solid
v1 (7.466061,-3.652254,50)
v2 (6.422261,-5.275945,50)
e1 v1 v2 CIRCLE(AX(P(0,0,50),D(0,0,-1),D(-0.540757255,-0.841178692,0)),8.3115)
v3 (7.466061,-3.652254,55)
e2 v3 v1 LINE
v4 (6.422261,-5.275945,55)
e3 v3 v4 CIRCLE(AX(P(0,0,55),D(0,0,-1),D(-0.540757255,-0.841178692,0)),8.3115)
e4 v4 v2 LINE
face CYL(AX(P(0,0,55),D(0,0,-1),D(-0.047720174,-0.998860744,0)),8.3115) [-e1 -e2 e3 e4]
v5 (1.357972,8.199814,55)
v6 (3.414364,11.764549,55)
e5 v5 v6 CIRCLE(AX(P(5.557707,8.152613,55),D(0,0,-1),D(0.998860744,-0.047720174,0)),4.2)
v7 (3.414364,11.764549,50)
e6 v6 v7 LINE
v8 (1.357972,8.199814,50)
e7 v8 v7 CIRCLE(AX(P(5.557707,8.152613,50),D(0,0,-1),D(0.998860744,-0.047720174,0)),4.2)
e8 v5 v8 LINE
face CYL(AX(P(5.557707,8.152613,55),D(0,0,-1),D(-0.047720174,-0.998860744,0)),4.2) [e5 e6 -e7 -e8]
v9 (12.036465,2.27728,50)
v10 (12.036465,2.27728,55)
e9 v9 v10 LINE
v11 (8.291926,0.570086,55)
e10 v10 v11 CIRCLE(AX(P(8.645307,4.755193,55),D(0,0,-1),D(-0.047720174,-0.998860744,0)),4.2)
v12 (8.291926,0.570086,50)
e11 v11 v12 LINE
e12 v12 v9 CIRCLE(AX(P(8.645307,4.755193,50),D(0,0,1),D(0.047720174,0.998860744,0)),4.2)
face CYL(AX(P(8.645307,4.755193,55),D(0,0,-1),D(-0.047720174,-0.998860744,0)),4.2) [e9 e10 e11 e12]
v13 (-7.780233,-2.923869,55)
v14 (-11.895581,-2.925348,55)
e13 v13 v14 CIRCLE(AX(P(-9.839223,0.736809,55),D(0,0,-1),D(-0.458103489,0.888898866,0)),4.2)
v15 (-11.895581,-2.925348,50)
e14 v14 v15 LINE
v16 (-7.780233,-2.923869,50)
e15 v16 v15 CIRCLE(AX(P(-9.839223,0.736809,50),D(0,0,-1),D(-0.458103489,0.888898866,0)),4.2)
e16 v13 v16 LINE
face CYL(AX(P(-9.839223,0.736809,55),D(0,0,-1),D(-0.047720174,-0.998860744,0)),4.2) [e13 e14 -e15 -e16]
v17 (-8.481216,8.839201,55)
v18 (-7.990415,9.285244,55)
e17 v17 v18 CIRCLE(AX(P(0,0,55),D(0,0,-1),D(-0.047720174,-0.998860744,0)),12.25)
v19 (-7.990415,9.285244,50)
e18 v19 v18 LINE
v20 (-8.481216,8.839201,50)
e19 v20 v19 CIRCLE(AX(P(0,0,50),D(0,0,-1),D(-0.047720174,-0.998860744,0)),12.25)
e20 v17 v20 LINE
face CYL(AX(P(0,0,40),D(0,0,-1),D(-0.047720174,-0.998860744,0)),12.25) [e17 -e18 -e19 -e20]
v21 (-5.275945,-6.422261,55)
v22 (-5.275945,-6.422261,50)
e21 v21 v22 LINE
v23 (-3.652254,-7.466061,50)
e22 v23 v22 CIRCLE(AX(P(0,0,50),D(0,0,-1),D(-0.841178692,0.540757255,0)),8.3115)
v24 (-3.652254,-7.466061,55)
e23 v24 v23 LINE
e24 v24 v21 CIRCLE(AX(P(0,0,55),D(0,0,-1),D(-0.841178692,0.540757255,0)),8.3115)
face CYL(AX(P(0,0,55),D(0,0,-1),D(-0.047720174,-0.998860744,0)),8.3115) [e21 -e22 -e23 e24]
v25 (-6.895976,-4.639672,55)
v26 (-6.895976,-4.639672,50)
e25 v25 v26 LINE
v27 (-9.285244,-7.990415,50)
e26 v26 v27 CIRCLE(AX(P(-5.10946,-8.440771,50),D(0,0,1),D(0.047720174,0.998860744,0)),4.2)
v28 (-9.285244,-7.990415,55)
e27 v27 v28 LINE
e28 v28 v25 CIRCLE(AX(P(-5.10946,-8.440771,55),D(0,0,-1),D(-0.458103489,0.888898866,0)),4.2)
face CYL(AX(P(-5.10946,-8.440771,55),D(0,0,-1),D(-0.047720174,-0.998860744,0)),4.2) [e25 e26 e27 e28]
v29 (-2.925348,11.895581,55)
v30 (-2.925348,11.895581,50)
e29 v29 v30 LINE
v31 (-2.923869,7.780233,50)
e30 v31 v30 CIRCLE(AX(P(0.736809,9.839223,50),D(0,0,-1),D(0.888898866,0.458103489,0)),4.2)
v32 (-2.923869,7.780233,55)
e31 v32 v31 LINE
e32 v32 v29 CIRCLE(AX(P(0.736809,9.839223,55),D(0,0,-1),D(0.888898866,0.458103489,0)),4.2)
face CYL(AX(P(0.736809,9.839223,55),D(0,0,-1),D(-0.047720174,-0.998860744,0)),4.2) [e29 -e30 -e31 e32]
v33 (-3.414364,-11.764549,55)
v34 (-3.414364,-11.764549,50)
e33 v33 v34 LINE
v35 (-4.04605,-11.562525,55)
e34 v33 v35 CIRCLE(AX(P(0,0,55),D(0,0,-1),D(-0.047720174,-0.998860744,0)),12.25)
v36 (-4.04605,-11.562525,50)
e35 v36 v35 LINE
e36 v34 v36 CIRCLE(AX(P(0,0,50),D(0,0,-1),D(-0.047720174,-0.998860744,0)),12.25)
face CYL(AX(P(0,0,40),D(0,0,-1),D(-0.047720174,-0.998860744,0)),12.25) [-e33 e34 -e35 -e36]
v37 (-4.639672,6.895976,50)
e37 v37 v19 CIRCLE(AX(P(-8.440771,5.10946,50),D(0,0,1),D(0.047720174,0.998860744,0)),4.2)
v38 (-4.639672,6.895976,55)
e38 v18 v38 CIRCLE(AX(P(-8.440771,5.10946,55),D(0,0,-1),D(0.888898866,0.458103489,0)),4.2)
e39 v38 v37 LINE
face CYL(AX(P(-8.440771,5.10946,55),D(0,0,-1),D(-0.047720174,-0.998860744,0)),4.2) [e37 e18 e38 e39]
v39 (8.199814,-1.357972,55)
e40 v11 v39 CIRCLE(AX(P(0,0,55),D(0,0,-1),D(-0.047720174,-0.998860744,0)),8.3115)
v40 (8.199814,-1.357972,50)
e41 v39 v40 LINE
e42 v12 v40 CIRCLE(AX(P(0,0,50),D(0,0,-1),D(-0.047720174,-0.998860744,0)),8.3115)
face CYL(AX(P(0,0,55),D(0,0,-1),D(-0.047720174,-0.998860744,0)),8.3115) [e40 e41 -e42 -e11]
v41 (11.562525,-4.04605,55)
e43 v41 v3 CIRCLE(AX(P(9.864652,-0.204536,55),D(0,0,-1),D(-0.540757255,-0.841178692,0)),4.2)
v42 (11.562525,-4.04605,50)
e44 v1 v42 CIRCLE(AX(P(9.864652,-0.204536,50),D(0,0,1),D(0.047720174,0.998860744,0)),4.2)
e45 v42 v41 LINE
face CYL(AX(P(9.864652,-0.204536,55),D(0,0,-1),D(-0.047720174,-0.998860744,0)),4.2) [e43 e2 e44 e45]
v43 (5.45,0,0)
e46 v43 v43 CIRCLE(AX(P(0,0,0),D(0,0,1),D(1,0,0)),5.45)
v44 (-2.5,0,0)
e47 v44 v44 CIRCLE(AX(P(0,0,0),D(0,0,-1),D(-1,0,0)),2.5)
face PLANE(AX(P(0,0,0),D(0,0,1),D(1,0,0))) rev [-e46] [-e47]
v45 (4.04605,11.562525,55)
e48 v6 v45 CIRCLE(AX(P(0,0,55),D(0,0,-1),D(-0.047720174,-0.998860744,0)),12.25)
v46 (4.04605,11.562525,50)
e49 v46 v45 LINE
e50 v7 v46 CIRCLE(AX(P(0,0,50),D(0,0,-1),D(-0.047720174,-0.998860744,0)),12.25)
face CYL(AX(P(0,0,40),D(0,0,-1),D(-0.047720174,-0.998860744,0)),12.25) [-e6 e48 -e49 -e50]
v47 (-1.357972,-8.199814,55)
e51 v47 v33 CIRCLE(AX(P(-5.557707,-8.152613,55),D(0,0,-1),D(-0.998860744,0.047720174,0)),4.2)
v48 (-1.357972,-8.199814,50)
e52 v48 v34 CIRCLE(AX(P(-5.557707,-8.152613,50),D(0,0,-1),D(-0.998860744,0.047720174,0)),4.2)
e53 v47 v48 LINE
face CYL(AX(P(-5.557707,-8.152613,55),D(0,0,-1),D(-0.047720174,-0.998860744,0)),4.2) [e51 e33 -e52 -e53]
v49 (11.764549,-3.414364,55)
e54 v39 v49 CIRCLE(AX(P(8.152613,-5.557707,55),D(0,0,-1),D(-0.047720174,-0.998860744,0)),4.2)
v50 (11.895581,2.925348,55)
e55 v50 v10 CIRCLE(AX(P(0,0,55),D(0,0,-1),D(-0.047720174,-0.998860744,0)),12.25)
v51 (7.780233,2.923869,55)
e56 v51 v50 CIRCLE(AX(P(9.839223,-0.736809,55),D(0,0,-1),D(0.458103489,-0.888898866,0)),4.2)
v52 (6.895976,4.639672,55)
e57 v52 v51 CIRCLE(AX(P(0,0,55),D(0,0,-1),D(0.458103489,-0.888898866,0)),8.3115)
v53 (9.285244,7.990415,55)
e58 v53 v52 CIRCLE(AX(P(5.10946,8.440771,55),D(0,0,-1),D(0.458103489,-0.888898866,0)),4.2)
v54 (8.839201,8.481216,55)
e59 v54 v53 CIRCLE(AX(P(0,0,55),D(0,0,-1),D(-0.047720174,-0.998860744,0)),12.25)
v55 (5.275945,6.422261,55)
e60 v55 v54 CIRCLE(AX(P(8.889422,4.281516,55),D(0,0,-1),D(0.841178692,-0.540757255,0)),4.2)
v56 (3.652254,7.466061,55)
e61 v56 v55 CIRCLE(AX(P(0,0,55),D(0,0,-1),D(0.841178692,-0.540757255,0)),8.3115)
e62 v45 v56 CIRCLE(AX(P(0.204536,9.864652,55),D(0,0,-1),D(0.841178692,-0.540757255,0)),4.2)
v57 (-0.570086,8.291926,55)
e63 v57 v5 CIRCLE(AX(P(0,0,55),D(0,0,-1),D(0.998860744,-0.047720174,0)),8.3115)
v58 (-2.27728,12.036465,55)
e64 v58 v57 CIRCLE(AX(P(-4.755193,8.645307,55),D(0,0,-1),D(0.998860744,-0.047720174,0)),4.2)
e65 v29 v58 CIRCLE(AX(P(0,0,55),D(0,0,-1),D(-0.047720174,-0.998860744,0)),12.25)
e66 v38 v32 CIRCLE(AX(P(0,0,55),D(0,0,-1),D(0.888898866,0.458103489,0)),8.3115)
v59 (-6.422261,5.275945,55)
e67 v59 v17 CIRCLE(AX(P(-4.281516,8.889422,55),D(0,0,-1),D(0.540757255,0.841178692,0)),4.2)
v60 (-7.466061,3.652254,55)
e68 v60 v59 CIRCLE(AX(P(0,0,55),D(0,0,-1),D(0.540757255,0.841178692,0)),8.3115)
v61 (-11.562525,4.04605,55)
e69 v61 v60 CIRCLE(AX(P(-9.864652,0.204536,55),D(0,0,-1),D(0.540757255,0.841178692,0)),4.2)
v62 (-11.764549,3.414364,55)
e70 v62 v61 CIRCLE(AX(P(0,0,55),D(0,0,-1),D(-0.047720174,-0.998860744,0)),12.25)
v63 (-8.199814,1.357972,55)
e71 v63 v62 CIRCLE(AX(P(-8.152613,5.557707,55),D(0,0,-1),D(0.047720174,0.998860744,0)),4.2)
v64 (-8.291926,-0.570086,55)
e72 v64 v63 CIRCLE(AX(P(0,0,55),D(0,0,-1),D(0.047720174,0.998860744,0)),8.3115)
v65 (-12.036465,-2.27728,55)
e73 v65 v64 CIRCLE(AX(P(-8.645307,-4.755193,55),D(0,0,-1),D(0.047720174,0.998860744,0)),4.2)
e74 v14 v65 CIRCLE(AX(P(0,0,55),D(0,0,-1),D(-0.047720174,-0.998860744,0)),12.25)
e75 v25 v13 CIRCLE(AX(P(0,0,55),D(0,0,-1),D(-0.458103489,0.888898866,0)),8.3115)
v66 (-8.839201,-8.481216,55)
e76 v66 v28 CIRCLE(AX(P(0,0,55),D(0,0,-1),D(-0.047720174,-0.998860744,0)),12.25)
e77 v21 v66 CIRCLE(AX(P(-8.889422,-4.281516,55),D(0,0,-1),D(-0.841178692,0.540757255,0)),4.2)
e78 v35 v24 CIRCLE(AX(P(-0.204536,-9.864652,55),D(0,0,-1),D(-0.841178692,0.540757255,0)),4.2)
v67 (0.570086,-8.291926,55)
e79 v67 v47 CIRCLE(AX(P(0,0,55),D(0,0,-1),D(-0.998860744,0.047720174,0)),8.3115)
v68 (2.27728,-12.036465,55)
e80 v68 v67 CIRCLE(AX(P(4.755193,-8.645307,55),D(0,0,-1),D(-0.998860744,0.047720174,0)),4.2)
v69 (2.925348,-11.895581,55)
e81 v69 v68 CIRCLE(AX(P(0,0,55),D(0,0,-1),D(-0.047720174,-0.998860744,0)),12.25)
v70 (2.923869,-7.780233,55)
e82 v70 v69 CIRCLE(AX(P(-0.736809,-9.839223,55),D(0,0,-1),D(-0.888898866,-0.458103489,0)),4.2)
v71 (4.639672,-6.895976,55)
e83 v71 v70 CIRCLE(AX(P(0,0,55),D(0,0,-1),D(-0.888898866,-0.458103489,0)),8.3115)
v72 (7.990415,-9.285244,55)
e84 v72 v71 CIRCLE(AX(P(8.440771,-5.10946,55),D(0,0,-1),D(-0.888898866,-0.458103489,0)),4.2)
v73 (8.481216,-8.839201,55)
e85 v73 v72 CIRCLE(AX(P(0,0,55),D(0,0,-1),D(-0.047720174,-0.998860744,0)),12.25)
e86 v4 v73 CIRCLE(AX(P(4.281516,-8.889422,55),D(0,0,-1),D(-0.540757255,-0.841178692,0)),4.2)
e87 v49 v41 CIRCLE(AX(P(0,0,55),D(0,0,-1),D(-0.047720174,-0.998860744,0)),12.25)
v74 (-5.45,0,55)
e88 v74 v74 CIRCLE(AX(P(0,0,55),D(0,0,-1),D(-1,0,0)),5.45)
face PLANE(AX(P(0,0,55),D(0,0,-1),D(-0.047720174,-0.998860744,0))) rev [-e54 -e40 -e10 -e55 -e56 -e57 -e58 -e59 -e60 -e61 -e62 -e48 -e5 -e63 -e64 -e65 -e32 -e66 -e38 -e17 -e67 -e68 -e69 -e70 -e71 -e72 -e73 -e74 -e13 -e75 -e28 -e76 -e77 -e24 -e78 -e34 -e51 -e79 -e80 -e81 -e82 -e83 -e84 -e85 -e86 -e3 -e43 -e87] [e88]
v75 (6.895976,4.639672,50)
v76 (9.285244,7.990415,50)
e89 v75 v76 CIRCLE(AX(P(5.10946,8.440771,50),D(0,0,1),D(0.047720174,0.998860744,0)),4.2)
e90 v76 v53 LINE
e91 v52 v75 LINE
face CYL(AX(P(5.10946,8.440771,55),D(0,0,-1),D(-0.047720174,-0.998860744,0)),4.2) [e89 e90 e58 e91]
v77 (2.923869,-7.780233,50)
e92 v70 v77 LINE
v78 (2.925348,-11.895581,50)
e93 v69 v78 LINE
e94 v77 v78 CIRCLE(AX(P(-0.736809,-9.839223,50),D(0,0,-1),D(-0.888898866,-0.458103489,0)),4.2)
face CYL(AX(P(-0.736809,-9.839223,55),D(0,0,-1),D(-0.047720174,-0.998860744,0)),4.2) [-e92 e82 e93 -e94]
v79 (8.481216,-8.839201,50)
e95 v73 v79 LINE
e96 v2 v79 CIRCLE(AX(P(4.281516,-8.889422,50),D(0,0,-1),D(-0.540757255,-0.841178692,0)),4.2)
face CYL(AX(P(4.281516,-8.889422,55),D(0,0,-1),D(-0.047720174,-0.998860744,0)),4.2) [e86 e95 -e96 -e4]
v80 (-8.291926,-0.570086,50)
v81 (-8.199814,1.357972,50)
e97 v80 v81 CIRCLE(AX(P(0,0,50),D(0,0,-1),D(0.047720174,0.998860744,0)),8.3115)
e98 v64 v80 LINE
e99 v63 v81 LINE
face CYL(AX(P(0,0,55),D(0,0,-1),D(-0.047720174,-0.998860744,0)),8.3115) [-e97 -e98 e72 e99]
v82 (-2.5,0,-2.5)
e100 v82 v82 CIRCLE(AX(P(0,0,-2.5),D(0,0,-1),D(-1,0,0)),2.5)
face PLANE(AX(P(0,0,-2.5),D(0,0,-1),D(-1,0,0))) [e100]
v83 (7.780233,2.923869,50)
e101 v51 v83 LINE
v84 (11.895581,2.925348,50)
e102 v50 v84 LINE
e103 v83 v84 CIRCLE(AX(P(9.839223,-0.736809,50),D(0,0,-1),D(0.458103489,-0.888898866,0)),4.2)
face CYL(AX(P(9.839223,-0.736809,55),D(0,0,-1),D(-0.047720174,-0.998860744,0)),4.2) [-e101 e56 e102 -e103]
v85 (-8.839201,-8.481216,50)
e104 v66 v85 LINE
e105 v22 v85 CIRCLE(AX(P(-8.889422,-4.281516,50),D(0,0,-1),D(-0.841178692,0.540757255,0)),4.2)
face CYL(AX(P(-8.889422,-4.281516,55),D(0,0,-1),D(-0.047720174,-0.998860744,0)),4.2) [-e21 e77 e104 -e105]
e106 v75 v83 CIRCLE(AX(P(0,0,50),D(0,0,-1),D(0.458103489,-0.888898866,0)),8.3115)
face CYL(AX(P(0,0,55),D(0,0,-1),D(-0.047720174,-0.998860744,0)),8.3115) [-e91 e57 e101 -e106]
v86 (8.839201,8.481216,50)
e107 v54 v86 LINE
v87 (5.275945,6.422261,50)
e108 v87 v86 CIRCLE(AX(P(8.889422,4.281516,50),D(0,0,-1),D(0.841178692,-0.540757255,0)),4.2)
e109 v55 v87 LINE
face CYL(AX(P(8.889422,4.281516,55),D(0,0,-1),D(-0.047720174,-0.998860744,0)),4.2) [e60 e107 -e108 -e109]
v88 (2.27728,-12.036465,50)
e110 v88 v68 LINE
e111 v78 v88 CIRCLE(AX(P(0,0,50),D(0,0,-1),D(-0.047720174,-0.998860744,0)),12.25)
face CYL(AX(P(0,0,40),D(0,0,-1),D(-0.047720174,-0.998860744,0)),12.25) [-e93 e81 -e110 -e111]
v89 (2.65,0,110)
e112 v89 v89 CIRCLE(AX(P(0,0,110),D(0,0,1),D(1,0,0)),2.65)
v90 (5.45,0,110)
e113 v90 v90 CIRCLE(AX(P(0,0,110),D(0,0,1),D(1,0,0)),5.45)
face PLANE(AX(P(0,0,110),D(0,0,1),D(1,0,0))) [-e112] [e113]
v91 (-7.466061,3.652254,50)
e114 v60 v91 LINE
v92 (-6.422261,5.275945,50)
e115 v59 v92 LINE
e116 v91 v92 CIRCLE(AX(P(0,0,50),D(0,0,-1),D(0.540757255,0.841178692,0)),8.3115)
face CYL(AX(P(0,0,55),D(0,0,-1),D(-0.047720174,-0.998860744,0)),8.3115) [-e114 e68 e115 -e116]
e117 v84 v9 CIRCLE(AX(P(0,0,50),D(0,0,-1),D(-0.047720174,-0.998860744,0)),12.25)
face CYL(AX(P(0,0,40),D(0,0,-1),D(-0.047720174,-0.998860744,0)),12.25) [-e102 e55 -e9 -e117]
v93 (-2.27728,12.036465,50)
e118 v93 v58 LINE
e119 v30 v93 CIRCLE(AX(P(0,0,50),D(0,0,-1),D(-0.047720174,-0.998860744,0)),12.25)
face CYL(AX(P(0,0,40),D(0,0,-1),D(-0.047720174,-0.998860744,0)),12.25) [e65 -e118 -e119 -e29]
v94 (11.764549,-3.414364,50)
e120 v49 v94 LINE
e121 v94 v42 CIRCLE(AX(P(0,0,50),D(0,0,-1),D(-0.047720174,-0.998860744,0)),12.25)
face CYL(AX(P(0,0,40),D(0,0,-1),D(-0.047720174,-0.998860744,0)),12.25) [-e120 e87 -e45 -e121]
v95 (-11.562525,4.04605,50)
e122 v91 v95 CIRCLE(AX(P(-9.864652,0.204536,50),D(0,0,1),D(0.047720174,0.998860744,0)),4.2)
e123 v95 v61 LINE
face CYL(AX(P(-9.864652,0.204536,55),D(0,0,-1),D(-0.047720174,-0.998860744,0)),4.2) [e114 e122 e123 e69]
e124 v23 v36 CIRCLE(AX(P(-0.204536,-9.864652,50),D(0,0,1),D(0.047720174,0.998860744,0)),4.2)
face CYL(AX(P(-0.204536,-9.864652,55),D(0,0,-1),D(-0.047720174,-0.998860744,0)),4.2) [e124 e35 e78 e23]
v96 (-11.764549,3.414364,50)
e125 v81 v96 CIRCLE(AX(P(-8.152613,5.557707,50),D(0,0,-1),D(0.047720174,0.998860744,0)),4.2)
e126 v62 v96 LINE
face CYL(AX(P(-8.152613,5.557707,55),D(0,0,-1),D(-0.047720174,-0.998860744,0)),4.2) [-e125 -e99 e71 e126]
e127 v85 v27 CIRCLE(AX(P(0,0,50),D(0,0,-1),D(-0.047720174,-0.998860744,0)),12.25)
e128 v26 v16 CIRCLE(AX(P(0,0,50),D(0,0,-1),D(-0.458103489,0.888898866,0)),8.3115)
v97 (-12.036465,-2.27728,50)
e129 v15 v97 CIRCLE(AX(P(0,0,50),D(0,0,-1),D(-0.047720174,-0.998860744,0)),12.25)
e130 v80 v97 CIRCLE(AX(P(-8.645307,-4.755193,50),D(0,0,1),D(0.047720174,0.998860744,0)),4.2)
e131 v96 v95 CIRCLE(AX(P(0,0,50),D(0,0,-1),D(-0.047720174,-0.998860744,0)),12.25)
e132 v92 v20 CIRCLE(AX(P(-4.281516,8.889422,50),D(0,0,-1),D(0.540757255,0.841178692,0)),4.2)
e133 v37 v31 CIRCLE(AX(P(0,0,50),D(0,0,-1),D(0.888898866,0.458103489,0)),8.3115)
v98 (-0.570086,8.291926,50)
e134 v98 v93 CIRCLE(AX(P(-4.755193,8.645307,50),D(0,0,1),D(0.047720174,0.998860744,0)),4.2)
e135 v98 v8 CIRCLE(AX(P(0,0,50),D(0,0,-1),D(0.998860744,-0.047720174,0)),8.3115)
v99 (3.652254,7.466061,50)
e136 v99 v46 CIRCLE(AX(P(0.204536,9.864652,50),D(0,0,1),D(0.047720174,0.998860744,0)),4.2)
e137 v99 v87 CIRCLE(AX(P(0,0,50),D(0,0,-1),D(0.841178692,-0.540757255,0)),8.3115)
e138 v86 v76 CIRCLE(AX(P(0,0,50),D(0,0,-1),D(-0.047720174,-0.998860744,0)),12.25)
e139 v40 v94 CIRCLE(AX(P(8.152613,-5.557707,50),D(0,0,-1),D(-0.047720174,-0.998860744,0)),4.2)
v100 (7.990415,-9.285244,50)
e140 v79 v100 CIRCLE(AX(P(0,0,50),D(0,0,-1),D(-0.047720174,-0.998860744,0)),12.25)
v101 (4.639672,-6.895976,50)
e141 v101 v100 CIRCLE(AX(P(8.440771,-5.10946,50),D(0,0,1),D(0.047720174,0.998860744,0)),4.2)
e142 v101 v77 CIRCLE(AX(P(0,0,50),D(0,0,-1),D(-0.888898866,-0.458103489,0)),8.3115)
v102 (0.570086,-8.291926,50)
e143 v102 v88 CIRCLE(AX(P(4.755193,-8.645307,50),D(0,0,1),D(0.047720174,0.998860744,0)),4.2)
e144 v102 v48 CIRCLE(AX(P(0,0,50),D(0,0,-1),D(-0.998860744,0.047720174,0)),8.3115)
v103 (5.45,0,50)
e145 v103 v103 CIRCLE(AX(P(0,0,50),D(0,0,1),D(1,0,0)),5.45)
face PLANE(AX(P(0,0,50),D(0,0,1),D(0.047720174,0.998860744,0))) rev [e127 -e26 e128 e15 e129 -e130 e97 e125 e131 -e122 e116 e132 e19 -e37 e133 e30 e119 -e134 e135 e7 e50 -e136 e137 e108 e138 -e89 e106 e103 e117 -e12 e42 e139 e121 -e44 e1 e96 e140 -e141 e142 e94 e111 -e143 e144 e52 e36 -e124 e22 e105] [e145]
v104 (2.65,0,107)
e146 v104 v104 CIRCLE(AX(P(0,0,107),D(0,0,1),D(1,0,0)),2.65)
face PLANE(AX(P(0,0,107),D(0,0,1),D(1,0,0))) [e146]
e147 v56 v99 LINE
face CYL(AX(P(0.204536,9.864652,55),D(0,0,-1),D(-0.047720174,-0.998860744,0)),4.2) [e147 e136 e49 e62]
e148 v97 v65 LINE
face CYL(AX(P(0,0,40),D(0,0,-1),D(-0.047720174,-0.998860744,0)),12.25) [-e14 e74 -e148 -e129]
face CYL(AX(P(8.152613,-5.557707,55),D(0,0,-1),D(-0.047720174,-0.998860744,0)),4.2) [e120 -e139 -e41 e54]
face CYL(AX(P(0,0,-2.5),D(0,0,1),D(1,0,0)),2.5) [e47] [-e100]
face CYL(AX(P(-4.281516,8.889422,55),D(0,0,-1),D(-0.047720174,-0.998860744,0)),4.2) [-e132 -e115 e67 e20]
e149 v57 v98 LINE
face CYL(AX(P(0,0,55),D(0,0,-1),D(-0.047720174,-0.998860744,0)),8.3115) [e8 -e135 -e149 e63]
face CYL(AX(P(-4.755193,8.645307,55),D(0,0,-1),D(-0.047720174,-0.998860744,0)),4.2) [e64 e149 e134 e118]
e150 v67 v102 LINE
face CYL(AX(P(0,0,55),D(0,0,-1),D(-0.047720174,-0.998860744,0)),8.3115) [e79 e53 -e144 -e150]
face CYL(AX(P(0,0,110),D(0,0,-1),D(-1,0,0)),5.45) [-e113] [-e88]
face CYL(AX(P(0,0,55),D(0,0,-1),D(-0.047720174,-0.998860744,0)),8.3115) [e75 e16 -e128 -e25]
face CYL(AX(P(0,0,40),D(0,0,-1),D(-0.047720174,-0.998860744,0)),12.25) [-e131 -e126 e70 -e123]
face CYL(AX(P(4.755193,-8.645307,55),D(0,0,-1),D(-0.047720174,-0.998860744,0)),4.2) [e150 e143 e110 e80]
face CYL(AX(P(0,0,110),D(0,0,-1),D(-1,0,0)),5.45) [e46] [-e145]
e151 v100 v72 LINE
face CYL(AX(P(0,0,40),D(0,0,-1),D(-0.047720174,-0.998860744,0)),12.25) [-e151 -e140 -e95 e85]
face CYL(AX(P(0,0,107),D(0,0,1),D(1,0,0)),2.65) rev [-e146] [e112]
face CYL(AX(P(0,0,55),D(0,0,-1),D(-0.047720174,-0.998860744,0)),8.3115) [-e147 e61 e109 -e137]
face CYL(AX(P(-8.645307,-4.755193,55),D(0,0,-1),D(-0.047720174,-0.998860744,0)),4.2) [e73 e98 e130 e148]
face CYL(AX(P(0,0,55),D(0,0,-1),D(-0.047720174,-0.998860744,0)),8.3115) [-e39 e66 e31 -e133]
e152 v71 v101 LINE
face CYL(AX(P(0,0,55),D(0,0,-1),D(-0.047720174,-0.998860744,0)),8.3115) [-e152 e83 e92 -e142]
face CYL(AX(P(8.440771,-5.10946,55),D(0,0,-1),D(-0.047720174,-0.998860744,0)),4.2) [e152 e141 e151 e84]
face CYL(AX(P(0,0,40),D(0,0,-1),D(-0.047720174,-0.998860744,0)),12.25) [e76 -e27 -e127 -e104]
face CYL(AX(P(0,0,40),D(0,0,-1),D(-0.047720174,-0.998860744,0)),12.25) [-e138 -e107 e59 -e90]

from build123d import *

# Parameters (mm, degrees)
SKETCH1_R           = 5.45
BOSS_EXTRUDE1_DEPTH = 110
SKETCH6_R           = 2.5
BOSS_EXTRUDE2_DEPTH = 2.5
SKETCH7_R           = 2.65
CUT_EXTRUDE1_DEPTH  = 3
JOIN1_START         = 50
JOIN1_DEPTH         = 5


# Read off the part's stored shape, not the designer's step: Join1
with BuildPart() as part:
    # Sketch1 → Boss-Extrude1 (new body)
    with BuildSketch(Plane.XY):
        Circle(SKETCH1_R)
    extrude(amount=BOSS_EXTRUDE1_DEPTH)

    # Sketch6 → Boss-Extrude2 (add)
    with BuildSketch(Plane(origin=(0, 0, 0), x_dir=(-1, 0, 0), z_dir=(0, 0, -1))):
        Circle(SKETCH6_R)
    extrude(amount=BOSS_EXTRUDE2_DEPTH)

    # Sketch7 → Cut-Extrude1 (cut)
    with BuildSketch(Plane.XY.offset(110)):
        Circle(SKETCH7_R)
    extrude(amount=-CUT_EXTRUDE1_DEPTH, mode=Mode.SUBTRACT)

    # Join1 outline → Join1 (add)
    with BuildSketch(Plane.XY.offset(JOIN1_START)):
        with BuildLine():
            ThreePointArc((-9.285244381, -7.990415307), (-9.065544683, -8.238834845), (-8.839200881, -8.481216173))
            ThreePointArc((-8.839200881, -8.481216173), (-6.788114029, -7.918067874), (-5.275945069, -6.422260963))
            ThreePointArc((-5.275945069, -6.422260963), (-4.494503923, -6.991456696), (-3.652254242, -7.466061291))
            ThreePointArc((-3.652254242, -7.466061291), (-4.385263154, -9.462756364), (-4.046049861, -11.562524833))
            ThreePointArc((-4.046049861, -11.562524833), (-3.731574572, -11.667812615), (-3.414364426, -11.764549102))
            ThreePointArc((-3.414364426, -11.764549102), (-1.919645256, -10.251304943), (-1.357971977, -8.199813678))
            ThreePointArc((-1.357971977, -8.199813678), (-0.396626227, -8.30203107), (0.570085691, -8.291925865))
            ThreePointArc((0.570085691, -8.291925865), (0.933628889, -10.387618978), (2.277280452, -12.036465168))
            ThreePointArc((2.277280452, -12.036465168), (2.602267932, -11.970409417), (2.92534822, -11.895580599))
            ThreePointArc((2.92534822, -11.895580599), (3.463190913, -9.83771313), (2.923868609, -7.78023294))
            ThreePointArc((2.923868609, -7.78023294), (3.807527147, -7.388082923), (4.639671624, -6.8959756))
            ThreePointArc((4.639671624, -6.8959756), (6.002355825, -8.529127476), (7.990415307, -9.285244381))
            ThreePointArc((7.990415307, -9.285244381), (8.238834845, -9.065544683), (8.481216173, -8.839200881))
            ThreePointArc((8.481216173, -8.839200881), (7.918067874, -6.788114029), (6.422260963, -5.275945069))
            ThreePointArc((6.422260963, -5.275945069), (6.991456696, -4.494503923), (7.466061291, -3.652254242))
            ThreePointArc((7.466061291, -3.652254242), (9.462756364, -4.385263154), (11.562524833, -4.046049861))
            ThreePointArc((11.562524833, -4.046049861), (11.667812615, -3.731574572), (11.764549102, -3.414364426))
            ThreePointArc((11.764549102, -3.414364426), (10.251304943, -1.919645256), (8.199813678, -1.357971977))
            ThreePointArc((8.199813678, -1.357971977), (8.30203107, -0.396626227), (8.291925865, 0.570085691))
            ThreePointArc((8.291925865, 0.570085691), (10.387618978, 0.933628889), (12.036465168, 2.277280452))
            ThreePointArc((12.036465168, 2.277280452), (11.970409417, 2.602267932), (11.895580599, 2.92534822))
            ThreePointArc((11.895580599, 2.92534822), (9.83771313, 3.463190913), (7.78023294, 2.923868609))
            ThreePointArc((7.78023294, 2.923868609), (7.388082923, 3.807527147), (6.8959756, 4.639671624))
            ThreePointArc((6.8959756, 4.639671624), (8.529127476, 6.002355825), (9.285244381, 7.990415307))
            ThreePointArc((9.285244381, 7.990415307), (9.065544683, 8.238834845), (8.839200881, 8.481216173))
            ThreePointArc((8.839200881, 8.481216173), (6.788114029, 7.918067874), (5.275945069, 6.422260963))
            ThreePointArc((5.275945069, 6.422260963), (4.494503923, 6.991456696), (3.652254242, 7.466061291))
            ThreePointArc((3.652254242, 7.466061291), (4.385263154, 9.462756364), (4.046049861, 11.562524833))
            ThreePointArc((4.046049861, 11.562524833), (3.731574572, 11.667812615), (3.414364426, 11.764549102))
            ThreePointArc((3.414364426, 11.764549102), (1.919645256, 10.251304943), (1.357971977, 8.199813678))
            ThreePointArc((1.357971977, 8.199813678), (0.396626227, 8.30203107), (-0.570085691, 8.291925865))
            ThreePointArc((-0.570085691, 8.291925865), (-0.933628889, 10.387618978), (-2.277280452, 12.036465168))
            ThreePointArc((-2.277280452, 12.036465168), (-2.602267932, 11.970409417), (-2.92534822, 11.895580599))
            ThreePointArc((-2.92534822, 11.895580599), (-3.463190913, 9.83771313), (-2.923868609, 7.78023294))
            ThreePointArc((-2.923868609, 7.78023294), (-3.807527147, 7.388082923), (-4.639671624, 6.8959756))
            ThreePointArc((-4.639671624, 6.8959756), (-6.002355825, 8.529127476), (-7.990415307, 9.285244381))
            ThreePointArc((-7.990415307, 9.285244381), (-8.238834845, 9.065544683), (-8.481216173, 8.839200881))
            ThreePointArc((-8.481216173, 8.839200881), (-7.918067874, 6.788114029), (-6.422260963, 5.275945069))
            ThreePointArc((-6.422260963, 5.275945069), (-6.991456696, 4.494503923), (-7.466061291, 3.652254242))
            ThreePointArc((-7.466061291, 3.652254242), (-9.462756364, 4.385263154), (-11.562524833, 4.046049861))
            ThreePointArc((-11.562524833, 4.046049861), (-11.667812615, 3.731574572), (-11.764549102, 3.414364426))
            ThreePointArc((-11.764549102, 3.414364426), (-10.251304943, 1.919645256), (-8.199813678, 1.357971977))
            ThreePointArc((-8.199813678, 1.357971977), (-8.30203107, 0.396626227), (-8.291925865, -0.570085691))
            ThreePointArc((-8.291925865, -0.570085691), (-10.387618978, -0.933628889), (-12.036465168, -2.277280452))
            ThreePointArc((-12.036465168, -2.277280452), (-11.970409417, -2.602267932), (-11.895580599, -2.92534822))
            ThreePointArc((-11.895580599, -2.92534822), (-9.83771313, -3.463190913), (-7.78023294, -2.923868609))
            ThreePointArc((-7.78023294, -2.923868609), (-7.388082923, -3.807527147), (-6.8959756, -4.639671624))
            ThreePointArc((-6.8959756, -4.639671624), (-8.529127476, -6.002355825), (-9.285244381, -7.990415307))
        make_face()
    extrude(amount=JOIN1_DEPTH)


solid = part.part
